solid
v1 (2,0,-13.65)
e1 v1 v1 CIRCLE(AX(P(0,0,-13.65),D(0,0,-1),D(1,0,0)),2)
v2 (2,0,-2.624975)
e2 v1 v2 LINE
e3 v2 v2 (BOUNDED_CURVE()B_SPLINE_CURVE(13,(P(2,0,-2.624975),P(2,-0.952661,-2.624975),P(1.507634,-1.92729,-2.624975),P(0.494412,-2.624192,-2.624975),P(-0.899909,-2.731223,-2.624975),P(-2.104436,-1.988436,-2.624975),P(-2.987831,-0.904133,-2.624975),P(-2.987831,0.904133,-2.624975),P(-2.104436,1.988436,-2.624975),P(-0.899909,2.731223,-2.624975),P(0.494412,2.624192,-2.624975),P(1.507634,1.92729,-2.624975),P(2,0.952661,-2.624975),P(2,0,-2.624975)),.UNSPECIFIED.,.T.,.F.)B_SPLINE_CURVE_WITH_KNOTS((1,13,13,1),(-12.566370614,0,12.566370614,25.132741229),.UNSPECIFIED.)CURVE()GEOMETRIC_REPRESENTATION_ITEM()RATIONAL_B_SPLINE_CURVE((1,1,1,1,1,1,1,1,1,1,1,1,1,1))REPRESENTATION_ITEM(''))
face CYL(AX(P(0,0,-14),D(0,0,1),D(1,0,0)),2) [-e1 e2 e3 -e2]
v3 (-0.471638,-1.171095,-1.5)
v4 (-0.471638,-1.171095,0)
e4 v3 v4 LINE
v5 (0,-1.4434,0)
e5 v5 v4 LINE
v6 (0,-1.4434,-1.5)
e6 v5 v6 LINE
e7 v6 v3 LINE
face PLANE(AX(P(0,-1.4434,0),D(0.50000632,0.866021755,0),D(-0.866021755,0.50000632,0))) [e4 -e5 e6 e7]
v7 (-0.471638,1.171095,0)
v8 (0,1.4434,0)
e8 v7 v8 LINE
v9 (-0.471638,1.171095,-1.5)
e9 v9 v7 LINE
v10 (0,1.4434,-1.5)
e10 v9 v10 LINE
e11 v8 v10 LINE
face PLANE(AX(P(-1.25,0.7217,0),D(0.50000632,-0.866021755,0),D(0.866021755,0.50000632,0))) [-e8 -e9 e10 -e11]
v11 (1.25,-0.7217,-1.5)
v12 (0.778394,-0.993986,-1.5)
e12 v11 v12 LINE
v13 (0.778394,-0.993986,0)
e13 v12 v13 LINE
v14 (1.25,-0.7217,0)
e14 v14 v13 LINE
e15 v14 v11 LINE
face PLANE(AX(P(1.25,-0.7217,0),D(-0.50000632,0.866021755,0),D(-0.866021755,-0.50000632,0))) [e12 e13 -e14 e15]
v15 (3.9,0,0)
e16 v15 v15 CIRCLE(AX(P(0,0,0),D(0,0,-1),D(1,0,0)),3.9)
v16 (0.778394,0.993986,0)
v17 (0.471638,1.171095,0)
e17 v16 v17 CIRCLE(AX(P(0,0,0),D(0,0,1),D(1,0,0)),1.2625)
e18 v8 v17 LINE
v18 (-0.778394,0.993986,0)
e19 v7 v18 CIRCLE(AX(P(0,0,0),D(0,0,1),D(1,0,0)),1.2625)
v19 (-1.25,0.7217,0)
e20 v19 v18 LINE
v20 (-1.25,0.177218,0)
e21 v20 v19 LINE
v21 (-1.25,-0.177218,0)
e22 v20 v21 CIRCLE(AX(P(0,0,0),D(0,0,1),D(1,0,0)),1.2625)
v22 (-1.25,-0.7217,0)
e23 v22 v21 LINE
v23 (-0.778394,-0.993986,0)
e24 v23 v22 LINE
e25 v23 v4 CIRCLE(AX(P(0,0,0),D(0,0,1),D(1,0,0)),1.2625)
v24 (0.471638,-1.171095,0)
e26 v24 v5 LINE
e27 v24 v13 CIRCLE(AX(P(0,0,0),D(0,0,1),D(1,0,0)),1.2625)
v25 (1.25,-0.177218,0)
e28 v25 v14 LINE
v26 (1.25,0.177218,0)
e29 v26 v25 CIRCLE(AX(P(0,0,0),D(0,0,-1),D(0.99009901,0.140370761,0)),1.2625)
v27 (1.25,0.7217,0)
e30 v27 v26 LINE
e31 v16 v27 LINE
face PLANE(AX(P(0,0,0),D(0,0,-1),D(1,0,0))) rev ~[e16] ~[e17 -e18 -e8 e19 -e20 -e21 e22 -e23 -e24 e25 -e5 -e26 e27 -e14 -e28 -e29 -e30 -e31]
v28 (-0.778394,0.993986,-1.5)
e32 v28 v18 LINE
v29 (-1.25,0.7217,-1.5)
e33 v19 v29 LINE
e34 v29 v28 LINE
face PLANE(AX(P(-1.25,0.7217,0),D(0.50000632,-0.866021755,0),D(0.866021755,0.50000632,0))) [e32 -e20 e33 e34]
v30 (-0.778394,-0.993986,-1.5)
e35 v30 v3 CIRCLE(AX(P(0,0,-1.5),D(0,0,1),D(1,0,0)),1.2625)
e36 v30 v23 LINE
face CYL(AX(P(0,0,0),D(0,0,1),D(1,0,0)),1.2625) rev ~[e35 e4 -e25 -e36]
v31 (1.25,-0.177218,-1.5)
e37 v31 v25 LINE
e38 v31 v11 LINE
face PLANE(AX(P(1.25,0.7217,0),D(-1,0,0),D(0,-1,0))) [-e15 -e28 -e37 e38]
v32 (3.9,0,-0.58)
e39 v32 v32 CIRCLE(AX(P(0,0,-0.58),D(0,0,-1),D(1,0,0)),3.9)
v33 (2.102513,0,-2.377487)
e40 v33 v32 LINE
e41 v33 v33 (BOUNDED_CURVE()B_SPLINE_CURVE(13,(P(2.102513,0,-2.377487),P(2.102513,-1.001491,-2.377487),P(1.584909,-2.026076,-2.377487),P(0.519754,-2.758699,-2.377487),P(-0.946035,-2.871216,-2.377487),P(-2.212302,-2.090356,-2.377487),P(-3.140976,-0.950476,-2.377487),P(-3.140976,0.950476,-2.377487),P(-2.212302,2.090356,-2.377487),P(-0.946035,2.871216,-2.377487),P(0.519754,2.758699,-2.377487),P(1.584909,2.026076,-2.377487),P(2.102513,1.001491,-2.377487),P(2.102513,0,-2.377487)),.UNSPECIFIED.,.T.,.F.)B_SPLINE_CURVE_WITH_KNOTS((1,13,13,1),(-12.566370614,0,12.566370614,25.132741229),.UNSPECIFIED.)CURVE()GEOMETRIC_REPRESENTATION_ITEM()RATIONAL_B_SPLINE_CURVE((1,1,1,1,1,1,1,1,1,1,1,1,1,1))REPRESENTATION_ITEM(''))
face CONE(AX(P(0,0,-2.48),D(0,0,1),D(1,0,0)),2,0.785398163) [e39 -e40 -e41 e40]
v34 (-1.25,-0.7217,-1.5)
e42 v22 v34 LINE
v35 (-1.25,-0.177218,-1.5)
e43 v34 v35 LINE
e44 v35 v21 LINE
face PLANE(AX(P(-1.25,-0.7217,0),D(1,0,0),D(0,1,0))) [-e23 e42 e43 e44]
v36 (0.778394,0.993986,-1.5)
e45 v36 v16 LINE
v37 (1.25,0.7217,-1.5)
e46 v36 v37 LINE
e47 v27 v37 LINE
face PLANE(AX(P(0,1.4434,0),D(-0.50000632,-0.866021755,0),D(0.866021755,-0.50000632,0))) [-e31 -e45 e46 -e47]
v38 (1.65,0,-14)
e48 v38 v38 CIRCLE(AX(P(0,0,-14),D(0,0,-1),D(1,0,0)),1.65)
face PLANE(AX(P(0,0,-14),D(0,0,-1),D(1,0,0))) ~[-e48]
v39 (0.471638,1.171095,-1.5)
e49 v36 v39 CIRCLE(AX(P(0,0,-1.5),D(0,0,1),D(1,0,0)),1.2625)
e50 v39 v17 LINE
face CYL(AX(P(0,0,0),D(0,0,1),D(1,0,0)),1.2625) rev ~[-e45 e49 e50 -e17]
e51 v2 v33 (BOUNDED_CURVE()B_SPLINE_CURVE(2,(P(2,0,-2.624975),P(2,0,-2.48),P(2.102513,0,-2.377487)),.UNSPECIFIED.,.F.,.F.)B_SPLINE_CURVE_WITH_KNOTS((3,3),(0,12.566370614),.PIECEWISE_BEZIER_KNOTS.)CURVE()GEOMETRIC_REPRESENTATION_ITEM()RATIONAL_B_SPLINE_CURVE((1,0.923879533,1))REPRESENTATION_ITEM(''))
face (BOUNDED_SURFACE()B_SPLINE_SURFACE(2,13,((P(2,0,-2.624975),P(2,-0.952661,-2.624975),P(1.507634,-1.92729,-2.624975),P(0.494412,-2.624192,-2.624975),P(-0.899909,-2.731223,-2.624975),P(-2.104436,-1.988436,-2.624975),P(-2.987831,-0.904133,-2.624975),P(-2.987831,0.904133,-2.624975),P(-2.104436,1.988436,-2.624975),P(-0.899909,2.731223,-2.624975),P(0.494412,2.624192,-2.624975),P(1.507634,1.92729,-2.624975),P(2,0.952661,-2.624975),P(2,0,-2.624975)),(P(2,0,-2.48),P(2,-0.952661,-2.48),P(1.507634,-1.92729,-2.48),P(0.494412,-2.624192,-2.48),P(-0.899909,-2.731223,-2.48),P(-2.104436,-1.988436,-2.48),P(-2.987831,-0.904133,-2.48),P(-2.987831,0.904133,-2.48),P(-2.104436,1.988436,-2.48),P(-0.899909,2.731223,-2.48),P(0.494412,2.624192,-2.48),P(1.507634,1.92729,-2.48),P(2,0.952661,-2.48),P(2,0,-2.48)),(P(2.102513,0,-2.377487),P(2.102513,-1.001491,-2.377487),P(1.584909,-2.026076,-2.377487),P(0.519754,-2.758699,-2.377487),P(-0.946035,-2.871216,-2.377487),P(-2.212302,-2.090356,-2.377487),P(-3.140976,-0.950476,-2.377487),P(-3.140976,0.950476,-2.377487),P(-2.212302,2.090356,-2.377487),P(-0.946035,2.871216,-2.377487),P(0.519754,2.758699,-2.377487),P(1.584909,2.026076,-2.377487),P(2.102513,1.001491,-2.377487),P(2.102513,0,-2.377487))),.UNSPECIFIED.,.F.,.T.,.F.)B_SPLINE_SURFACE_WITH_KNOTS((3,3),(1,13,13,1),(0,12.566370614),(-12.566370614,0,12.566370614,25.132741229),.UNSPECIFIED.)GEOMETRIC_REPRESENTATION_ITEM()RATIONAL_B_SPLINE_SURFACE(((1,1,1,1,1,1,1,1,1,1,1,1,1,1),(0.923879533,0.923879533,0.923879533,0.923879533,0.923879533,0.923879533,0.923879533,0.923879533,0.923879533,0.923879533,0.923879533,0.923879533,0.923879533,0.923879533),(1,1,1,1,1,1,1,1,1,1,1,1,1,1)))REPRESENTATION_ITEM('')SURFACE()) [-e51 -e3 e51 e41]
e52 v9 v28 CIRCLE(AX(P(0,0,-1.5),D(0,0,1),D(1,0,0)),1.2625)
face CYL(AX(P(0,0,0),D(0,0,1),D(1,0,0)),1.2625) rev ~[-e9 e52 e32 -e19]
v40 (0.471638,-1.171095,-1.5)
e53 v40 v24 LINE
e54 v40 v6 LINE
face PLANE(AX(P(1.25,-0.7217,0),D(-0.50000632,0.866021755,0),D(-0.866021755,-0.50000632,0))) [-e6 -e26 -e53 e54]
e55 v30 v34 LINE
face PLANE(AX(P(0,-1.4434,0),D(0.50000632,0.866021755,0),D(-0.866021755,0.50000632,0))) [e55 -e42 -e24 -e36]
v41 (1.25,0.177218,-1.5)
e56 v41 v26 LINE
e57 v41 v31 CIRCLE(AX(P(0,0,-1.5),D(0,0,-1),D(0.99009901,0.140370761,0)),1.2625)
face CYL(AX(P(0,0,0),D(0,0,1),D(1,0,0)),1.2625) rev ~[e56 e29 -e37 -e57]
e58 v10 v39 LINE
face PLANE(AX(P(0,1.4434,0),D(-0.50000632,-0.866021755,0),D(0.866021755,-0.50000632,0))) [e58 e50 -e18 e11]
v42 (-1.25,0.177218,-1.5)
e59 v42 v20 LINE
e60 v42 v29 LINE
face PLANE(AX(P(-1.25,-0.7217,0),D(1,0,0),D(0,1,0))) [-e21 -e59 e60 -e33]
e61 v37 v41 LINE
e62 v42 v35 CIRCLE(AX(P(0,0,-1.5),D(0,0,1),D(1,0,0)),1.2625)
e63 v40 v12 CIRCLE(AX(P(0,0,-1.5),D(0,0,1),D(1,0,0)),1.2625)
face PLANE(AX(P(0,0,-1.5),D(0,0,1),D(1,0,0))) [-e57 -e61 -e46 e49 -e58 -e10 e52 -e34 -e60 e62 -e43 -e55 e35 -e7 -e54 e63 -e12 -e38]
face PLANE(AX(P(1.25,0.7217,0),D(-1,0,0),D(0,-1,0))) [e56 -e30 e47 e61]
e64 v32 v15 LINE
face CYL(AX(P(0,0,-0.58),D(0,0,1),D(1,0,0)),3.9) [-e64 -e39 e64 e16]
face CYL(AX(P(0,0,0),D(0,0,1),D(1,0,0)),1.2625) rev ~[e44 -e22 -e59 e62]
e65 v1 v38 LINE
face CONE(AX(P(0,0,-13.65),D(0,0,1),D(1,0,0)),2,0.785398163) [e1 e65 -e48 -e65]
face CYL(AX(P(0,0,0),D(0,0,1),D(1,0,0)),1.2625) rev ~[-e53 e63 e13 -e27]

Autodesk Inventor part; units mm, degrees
ref_plane "YZ Plane" through (0, 0, 0) normal (1, 0, 0) x (0, 1, 0)
sketch "Sketch2" plane through (0, 0, 0) normal (0, 1, 0) x (-1, 0, 0)
  line L0 (0, -14) -> (-2, -14)
  line L1 (0, 0) -> (0, -14)
  line L2 (-3.9, 0) -> (0, 0)
  line L3 (-3.9, -0.58) -> (-3.9, 0)
  line L4 (-2, -2.48) -> (-3.9, -0.58)
  line L5 (-2, -14) -> (-2, -2.48)
  line L6 (0, 0) -> (0, -14)
  dimension "d2" = 45
  dimension "d4" = 2
  dimension "d6" = 3.9
  dimension "d8" = 2.48
  dimension "d10" = 14
revolve "Revolution1" add sketch "Sketch2" angle 360 about axis through (0, 0, 0) along (0, 0, -1)
fillet "Fillet1" radius 0.35 1 edges at (-2, 0, -2.48)
chamfer "Chamfer1" distance 0.35 angle 45 1 edges at (-2, 0, -14)
sketch "Sketch4" plane through (0, 0, 0) normal (0, 0, 1) x (1, 0, 0)
  circle A0 centre (0, 0) radius 3.9 projected
  circle A1 centre (0, 0) radius 1.25 construction
  line L0 (-1.25, -0.7217) -> (-1.25, 0.7217)
  line L1 (-1.25, 0.7217) -> (0, 1.4434)
  line L2 (0, 1.4434) -> (1.25, 0.7217)
  line L3 (1.25, 0.7217) -> (1.25, -0.7217)
  line L4 (1.25, -0.7217) -> (0, -1.4434)
  line L5 (0, -1.4434) -> (-1.25, -0.7217)
  dimension "d27" = 2.5
extrude "Extrusion1" cut sketch "Sketch4" against normal blind 1.5 contours L0 L1 L2 L3 L4 L5
sketch "Sketch5" plane through (0, 0, 0) normal (0, 0, 1) x (1, 0, 0)
  circle A0 centre (0, 0) radius 3.9 projected
  circle A1 centre (0, 0) radius 1.2625
  dimension "d38" = 2.525
extrude "Extrusion2" cut sketch "Sketch5" against normal blind 1.5 contours A1
thread "Thread1" size "M4x0.7" class "4g6g" standard "ANSI Metric M Profile" length 10.12
ref_plane "MSC_PF1" through (0, 0, 0) normal (1, 0, 0) x (0, 1, 0)
ref_plane "MSC_PT1" through (3.9, 0, -0.58) normal (0, 0, -1) x (-1, 0, 0)
equation "\"d24\" = Rr"
equation "\"d25\" = 0.5 * PTC"
equation "\"d26\" = 0.5 * PTC"
equation "\"d38\" = 1.01 * ParJ"
equation "\"d39\" = Tt"
equation "\"d4\" = 0.5 * NND"
equation "\"d6\" = 0.5 * ParA"
equation "\"d8\" = ParH"
equation "\"d10\" = NLG"
equation "\"d27\" = ParJ"
equation "\"d28\" = Tt"
equation "\"d31\" = Lt"
equation "\"NND\" = 4"
equation "\"NLG\" = 14"
equation "\"PTC\" = 0.7"
equation "\"ParA\" = 7.8"
equation "\"ParH\" = 2.48"
equation "\"ParJ\" = 2.5"
equation "\"Tt\" = 1.5"
equation "\"Rr\" = 0.35"
equation "\"msp_e\" = 0.288675 * ParJ"
equation "\"Lt\" = 10.12"
equation "\"THREADDIA\" = NND"
properties part number "ASME/ANSI B18.3.5M - M4x14(2)" material "Steel, Mild"
